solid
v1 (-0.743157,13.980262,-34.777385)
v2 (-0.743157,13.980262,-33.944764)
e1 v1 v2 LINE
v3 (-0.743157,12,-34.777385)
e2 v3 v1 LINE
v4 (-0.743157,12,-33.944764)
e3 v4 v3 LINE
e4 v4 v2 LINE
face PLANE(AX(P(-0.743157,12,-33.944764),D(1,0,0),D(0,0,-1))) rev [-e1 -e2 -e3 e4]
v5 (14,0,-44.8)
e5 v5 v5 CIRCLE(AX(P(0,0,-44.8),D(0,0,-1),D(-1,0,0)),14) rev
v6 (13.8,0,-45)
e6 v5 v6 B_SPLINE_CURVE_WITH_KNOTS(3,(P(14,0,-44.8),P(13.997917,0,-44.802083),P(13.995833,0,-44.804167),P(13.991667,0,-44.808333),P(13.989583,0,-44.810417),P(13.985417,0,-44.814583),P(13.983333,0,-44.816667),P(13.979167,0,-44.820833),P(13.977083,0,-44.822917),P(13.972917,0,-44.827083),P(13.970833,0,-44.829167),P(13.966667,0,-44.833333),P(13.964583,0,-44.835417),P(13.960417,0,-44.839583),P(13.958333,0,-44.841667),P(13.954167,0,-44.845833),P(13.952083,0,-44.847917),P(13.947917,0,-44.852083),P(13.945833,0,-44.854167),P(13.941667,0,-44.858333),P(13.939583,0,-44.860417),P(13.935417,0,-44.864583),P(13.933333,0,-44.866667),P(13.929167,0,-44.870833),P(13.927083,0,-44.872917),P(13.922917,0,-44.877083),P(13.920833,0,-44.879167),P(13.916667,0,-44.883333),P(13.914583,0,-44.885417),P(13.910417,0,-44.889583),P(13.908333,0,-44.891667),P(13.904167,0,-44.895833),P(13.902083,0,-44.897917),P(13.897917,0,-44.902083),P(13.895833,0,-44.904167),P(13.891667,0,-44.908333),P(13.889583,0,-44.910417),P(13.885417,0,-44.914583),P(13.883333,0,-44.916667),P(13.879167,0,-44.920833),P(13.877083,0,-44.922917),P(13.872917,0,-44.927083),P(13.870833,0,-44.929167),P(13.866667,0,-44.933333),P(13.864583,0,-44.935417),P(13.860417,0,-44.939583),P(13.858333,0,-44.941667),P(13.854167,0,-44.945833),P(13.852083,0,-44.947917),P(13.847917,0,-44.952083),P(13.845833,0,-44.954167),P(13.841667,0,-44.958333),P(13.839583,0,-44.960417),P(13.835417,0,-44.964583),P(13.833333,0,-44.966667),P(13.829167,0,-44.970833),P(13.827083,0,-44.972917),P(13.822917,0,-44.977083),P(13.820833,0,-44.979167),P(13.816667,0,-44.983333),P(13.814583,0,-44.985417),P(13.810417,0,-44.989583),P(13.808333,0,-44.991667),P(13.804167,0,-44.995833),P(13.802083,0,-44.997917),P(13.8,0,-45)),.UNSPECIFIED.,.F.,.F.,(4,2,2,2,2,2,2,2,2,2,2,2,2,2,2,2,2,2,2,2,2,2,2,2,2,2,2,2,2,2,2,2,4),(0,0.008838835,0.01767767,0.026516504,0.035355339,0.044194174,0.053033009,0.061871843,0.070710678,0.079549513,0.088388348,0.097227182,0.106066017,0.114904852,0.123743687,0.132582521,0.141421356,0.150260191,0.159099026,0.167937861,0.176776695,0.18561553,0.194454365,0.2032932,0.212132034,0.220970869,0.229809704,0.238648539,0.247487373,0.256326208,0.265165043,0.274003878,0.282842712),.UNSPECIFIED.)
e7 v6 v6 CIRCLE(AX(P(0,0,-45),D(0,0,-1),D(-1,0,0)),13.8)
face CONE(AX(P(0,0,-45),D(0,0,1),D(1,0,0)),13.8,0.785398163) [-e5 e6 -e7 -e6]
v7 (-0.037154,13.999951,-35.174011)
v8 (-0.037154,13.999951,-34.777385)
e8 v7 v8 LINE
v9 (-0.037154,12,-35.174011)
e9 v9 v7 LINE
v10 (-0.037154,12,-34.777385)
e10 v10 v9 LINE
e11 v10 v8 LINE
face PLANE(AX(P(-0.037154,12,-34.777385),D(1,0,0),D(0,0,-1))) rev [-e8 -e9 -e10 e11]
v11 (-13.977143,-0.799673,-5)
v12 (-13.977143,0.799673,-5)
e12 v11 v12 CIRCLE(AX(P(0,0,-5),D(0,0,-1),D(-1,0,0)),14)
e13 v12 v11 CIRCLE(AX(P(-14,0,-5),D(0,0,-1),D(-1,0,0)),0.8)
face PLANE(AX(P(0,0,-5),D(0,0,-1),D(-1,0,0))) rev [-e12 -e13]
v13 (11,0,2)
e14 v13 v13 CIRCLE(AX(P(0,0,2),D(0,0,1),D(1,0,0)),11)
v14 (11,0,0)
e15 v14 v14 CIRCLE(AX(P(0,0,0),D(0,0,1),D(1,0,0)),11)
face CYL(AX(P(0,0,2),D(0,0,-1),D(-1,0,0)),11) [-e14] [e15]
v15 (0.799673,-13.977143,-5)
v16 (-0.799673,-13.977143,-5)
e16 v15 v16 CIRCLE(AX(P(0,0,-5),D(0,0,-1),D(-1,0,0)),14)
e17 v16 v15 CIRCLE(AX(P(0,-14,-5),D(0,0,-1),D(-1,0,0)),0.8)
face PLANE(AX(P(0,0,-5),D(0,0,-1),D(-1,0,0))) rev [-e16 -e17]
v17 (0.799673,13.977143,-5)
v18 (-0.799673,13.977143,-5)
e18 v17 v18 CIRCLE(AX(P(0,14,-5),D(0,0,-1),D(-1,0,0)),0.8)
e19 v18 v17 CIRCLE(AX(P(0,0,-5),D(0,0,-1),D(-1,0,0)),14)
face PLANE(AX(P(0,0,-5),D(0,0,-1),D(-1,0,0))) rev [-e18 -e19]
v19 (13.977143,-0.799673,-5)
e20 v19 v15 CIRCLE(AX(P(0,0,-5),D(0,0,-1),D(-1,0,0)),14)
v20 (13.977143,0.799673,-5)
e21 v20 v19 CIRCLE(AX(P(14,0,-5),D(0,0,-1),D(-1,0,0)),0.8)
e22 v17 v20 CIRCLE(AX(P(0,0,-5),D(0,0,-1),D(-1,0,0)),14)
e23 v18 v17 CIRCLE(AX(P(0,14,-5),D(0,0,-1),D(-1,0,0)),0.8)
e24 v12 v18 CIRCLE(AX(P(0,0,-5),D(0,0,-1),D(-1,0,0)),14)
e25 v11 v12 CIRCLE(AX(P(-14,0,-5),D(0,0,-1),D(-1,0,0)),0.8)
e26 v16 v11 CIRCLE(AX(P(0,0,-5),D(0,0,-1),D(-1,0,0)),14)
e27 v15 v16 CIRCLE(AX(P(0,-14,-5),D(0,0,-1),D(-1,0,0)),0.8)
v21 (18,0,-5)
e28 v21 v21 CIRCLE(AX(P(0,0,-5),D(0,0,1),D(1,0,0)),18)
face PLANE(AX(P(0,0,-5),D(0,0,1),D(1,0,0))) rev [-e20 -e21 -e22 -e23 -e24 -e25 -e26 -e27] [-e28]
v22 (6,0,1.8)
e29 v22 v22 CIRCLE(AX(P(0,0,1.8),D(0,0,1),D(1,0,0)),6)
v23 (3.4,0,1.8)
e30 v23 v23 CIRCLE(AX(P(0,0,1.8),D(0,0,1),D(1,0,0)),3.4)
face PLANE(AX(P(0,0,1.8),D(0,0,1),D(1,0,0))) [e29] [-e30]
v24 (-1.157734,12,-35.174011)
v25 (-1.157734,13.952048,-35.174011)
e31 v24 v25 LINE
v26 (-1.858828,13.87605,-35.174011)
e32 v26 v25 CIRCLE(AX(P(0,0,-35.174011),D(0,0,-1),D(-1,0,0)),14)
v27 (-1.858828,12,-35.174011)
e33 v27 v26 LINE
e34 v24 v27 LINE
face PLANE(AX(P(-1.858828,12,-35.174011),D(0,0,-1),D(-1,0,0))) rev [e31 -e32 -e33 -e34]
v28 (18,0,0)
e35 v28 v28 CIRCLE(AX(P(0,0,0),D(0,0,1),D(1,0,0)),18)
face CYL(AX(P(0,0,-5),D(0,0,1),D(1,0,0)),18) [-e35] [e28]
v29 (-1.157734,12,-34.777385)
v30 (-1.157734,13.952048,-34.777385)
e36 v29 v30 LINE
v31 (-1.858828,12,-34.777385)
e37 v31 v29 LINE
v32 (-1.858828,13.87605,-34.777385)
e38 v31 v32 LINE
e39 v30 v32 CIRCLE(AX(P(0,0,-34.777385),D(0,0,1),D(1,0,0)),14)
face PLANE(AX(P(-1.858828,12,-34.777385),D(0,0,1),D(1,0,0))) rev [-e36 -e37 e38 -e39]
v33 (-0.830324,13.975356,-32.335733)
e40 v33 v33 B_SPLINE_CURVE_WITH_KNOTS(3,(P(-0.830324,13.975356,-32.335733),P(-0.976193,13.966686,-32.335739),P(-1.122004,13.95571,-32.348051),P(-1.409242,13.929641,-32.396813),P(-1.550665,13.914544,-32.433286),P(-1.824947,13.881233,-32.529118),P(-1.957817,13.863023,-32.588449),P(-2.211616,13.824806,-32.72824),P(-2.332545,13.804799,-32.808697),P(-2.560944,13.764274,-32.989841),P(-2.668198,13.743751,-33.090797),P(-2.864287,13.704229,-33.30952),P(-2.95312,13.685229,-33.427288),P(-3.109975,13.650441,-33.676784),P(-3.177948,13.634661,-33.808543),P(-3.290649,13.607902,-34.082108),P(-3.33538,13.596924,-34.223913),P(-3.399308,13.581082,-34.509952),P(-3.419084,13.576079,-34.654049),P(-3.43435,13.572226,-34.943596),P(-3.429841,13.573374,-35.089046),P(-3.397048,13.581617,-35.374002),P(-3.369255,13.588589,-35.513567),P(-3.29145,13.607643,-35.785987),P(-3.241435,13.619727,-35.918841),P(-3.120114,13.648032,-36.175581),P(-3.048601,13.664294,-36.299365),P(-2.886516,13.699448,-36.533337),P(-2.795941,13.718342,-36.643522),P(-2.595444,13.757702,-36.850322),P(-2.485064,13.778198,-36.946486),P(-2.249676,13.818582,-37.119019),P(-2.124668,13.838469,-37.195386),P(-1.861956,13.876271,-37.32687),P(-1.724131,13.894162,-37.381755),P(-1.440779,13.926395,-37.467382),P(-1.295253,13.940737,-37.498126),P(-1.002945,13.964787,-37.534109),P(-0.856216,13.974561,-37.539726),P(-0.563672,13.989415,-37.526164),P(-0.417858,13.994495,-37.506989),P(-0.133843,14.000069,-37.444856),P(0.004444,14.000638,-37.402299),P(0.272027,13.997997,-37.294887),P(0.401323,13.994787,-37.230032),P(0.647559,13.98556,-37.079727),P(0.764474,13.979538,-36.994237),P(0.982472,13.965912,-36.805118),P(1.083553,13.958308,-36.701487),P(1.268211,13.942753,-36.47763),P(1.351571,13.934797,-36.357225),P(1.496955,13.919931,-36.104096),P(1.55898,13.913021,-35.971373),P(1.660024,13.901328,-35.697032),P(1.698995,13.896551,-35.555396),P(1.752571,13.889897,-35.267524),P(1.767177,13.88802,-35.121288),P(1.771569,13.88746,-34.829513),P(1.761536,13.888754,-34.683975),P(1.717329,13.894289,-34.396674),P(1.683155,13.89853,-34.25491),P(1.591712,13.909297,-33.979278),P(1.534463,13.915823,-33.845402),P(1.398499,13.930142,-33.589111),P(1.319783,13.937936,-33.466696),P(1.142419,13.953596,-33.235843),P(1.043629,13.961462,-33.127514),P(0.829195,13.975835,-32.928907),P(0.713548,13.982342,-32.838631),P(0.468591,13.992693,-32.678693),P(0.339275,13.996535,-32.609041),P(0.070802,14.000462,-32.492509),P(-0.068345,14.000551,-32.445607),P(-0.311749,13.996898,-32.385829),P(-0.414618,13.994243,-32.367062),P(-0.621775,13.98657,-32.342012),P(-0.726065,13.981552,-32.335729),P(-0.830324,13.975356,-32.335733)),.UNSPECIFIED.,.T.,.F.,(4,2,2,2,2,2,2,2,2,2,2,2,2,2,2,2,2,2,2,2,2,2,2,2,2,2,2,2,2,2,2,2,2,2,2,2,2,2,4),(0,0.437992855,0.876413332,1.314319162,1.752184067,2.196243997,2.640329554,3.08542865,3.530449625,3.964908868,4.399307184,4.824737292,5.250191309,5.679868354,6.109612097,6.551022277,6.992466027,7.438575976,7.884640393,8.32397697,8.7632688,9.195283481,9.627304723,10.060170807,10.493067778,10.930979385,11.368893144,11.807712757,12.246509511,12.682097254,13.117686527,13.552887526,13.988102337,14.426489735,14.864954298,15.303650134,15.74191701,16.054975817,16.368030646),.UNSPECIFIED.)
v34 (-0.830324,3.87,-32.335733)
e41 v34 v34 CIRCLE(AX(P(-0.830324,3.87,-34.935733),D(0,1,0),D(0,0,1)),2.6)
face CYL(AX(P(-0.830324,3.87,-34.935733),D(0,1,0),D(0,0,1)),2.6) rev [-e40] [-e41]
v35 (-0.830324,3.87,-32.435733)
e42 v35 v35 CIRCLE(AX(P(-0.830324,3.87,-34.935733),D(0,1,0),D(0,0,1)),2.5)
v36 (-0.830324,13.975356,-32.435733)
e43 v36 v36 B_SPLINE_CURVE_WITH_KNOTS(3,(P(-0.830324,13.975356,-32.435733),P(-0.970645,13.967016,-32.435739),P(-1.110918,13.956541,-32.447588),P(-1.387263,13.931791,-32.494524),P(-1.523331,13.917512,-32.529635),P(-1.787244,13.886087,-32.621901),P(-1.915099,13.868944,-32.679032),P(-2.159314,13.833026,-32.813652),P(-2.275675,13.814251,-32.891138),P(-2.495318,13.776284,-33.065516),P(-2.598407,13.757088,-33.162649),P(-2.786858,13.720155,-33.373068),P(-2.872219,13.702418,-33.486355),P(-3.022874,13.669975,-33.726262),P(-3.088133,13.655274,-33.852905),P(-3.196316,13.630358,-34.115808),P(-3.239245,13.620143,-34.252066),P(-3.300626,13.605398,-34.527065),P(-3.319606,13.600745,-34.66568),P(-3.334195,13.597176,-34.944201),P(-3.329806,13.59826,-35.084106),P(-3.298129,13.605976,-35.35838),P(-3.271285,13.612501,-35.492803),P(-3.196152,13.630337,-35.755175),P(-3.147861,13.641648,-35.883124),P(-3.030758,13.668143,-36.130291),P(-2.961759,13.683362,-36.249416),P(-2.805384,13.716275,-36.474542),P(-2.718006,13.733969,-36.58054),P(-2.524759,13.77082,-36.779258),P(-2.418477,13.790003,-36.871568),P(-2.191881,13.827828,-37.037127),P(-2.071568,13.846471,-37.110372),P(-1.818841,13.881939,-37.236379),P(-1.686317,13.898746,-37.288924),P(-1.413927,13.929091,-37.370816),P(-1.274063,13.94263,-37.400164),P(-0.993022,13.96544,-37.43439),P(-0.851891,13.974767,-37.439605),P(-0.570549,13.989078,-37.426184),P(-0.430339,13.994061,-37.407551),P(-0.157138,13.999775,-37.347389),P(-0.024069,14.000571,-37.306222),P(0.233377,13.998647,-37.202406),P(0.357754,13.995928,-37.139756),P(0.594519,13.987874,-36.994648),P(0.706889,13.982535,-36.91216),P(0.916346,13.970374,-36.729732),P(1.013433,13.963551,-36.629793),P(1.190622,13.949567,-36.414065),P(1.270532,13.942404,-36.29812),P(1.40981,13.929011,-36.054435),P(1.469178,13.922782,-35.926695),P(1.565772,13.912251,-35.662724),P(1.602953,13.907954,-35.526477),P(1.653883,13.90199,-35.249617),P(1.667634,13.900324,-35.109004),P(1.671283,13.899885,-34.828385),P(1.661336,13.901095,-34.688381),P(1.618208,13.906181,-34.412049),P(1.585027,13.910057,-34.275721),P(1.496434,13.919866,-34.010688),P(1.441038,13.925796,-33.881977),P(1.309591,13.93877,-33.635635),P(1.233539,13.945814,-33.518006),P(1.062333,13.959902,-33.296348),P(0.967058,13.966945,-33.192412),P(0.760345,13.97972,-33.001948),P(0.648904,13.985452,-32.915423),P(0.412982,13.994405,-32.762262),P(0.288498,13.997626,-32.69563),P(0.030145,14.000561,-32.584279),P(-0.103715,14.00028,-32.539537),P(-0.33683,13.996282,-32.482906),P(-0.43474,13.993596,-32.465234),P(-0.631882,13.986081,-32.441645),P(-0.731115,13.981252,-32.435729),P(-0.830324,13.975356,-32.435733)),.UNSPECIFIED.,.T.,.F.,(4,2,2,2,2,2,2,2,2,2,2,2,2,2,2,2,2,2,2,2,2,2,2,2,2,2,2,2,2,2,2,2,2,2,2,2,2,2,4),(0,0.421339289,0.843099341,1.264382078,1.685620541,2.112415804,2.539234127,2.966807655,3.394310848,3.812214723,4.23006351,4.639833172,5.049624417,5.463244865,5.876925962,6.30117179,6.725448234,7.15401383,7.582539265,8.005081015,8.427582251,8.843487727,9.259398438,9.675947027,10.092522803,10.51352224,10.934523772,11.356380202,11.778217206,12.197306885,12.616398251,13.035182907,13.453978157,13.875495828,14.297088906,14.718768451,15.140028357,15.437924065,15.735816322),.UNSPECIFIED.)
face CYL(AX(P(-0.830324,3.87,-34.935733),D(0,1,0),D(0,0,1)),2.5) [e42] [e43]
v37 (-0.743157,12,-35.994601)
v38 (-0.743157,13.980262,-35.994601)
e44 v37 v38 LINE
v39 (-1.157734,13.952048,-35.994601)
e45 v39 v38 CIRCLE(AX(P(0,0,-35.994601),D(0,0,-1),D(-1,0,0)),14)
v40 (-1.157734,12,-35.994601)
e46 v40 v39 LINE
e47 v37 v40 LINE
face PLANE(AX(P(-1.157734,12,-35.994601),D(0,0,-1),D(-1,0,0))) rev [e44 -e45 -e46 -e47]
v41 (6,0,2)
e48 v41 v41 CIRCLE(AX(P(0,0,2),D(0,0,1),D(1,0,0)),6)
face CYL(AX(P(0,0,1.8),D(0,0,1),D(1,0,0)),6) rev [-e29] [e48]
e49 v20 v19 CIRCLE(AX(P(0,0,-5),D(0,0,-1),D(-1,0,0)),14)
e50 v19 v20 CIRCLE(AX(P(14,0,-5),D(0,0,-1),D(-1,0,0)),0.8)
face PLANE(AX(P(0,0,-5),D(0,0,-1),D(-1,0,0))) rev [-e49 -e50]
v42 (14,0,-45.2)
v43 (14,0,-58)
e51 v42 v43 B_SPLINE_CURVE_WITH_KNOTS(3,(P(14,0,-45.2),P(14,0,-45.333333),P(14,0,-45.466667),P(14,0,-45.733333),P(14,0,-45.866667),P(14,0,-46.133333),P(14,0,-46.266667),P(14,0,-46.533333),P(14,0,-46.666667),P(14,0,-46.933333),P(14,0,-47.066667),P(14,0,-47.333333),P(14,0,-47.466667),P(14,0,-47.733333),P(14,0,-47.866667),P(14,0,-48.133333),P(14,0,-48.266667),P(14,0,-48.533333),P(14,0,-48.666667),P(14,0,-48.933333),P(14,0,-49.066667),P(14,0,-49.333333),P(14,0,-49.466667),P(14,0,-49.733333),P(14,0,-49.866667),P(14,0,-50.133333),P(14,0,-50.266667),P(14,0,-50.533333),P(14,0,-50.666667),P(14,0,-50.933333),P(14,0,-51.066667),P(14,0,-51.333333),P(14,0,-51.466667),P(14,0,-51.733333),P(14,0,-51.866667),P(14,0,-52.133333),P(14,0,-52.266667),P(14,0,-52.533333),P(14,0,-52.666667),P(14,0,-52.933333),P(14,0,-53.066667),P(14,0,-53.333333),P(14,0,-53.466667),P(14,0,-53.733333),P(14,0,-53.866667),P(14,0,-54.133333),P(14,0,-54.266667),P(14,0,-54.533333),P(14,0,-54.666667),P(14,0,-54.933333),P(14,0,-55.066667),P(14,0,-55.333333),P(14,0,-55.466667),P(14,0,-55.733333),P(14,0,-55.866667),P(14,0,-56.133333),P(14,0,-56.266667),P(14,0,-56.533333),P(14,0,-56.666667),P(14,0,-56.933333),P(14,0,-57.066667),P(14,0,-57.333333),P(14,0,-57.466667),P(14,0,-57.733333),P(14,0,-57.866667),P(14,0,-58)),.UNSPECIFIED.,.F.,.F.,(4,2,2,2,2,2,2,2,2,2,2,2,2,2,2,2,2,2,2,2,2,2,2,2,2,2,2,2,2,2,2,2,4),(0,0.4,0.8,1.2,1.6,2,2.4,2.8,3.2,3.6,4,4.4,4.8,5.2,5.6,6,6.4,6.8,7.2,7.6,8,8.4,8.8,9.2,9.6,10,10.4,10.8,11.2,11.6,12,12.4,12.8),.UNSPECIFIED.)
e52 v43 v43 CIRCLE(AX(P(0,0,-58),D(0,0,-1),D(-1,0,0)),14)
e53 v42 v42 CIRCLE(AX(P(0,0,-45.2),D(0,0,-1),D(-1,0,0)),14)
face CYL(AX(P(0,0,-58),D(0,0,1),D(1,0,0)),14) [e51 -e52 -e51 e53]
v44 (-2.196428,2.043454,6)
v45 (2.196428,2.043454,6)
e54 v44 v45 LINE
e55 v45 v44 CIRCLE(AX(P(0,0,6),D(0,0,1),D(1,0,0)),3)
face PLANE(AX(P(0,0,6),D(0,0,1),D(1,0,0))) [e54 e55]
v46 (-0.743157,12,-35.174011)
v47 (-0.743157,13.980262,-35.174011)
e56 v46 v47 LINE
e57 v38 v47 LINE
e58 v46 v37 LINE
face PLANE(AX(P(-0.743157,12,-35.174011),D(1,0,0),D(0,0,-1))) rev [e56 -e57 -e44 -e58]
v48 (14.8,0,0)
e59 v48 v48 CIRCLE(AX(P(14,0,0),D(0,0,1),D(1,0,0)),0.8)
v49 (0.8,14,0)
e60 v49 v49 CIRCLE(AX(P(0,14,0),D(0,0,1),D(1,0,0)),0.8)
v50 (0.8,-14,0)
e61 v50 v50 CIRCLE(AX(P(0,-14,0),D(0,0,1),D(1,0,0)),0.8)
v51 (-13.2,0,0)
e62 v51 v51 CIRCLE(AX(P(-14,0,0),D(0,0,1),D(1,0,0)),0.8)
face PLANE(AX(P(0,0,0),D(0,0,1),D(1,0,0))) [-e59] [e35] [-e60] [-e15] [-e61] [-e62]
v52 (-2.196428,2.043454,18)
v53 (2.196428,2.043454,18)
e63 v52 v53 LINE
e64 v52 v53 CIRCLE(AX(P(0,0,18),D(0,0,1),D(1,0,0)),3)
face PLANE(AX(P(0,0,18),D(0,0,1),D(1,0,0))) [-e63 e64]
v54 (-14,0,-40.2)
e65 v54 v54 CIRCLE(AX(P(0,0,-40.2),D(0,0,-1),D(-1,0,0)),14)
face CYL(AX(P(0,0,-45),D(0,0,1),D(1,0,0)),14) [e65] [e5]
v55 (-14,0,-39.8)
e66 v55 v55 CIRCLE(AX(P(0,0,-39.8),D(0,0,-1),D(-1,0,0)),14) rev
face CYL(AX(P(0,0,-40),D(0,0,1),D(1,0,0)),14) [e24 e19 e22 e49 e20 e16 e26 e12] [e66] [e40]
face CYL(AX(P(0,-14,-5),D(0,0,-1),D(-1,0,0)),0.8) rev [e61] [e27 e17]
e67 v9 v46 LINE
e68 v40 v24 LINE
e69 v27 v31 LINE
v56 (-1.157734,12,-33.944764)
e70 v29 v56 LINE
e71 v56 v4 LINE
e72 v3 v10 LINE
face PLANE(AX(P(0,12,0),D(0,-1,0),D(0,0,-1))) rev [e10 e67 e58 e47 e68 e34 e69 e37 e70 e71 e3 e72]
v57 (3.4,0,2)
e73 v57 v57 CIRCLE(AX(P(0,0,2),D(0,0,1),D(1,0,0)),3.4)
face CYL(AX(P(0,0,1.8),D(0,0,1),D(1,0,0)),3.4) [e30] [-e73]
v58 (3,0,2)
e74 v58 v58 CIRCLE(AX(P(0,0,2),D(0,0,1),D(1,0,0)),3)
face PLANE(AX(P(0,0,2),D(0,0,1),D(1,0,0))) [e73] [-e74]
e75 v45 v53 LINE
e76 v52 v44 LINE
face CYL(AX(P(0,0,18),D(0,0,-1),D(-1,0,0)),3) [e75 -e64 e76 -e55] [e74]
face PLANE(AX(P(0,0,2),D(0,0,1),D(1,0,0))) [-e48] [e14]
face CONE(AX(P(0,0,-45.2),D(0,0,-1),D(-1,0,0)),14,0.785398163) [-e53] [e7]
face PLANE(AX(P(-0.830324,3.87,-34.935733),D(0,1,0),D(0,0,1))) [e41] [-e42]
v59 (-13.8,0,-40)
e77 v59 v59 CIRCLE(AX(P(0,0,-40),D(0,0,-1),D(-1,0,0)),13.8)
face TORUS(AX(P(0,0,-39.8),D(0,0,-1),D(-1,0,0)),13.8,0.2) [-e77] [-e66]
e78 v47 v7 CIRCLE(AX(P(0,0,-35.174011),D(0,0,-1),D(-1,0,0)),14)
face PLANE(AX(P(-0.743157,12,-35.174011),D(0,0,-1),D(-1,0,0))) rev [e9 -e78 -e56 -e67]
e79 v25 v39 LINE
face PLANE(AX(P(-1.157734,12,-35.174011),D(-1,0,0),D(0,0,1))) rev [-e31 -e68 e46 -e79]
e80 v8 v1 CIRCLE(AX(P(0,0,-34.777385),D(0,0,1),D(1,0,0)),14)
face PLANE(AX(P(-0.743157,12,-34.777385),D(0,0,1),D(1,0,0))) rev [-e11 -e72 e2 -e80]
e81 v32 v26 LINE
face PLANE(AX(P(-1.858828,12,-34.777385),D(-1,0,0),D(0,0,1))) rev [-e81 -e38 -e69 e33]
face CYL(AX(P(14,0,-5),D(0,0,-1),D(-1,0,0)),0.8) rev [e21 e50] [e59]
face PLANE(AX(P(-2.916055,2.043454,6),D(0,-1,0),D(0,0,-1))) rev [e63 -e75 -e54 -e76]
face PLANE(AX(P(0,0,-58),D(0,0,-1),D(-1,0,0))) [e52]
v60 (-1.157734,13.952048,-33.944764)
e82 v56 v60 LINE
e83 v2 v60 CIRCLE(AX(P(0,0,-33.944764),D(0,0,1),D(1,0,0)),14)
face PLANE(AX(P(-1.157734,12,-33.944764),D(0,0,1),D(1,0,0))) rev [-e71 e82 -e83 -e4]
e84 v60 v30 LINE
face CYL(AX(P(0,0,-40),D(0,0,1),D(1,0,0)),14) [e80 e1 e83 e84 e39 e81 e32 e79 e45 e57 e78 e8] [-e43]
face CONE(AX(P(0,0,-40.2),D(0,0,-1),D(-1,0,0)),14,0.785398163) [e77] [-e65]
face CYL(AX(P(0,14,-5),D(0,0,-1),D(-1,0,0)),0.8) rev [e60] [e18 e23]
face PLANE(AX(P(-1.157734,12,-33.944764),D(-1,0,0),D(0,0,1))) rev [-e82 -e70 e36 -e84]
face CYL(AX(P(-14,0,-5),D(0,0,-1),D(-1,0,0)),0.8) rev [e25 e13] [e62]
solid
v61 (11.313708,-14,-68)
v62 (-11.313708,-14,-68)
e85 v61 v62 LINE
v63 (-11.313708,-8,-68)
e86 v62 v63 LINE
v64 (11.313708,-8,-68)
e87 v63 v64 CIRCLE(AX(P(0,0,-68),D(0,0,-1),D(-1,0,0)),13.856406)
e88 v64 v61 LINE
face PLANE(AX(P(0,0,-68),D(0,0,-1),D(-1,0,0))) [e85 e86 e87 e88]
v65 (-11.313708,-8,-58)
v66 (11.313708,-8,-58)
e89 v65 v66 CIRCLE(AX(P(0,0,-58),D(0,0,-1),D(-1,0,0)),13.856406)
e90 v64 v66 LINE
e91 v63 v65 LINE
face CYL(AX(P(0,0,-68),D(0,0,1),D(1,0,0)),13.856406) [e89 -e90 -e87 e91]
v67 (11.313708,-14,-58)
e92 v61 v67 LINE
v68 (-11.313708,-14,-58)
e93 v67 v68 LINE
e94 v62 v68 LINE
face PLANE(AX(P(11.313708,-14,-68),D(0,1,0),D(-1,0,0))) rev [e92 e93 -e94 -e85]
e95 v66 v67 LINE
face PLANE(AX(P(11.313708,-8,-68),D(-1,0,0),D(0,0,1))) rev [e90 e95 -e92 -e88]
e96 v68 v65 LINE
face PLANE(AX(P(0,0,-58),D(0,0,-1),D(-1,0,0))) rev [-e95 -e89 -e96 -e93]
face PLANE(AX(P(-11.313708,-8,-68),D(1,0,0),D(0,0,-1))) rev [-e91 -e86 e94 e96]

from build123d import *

# Parameters (mm, degrees)
SKETCH1_R                   = 18
BOSS_EXTRUDE2_DEPTH         = 5
SKETCH1_4_R                 = 11
BOSS_EXTRUDE3_DEPTH         = 2
SKETCH2_R                   = 3
BOSS_EXTRUDE4_DEPTH         = 16
SKETCH3_W                   = 6.362998302
SKETCH3_H                   = 1.749824533
CUT_EXTRUDE1_DEPTH          = 12
SKETCH4_R                   = 6
SKETCH4_R_2                 = 3.4
CUT_EXTRUDE2_DEPTH          = 0.2
TAP_DRILL_FOR_M2X0_4_TAP1_D = 1.6
SKETCH5_R                   = 14
BOSS_EXTRUDE5_DEPTH         = 35
FILLET2_R                   = 0.2
SKETCH7_R                   = 14
BOSS_EXTRUDE6_DEPTH         = 5
CHAMFER1_SIZE               = 0.2
SKETCH10_R                  = 14
BOSS_EXTRUDE7_DEPTH         = 13
CHAMFER2_SIZE               = 0.2
BOSS_EXTRUDE8_DEPTH         = 10
SKETCH12_R                  = 2.6
SKETCH12_R_2                = 2.5
CUT_EXTRUDE3_DEPTH          = 10.13
CUT_EXTRUDE4_DEPTH          = 2


# Some blends are built 0.0001 mm under size
with BuildPart() as part:
    # Sketch1 → Boss-Extrude2 (new body)
    with BuildSketch(Plane.XY):
        Circle(SKETCH1_R)
    extrude(amount=-BOSS_EXTRUDE2_DEPTH)

    # Sketch1<4> → Boss-Extrude3 (add)
    with BuildSketch(Plane.XY):
        Circle(SKETCH1_4_R)
    extrude(amount=BOSS_EXTRUDE3_DEPTH)

    # Sketch2 → Boss-Extrude4 (add)
    with BuildSketch(Plane.XY.offset(2)):
        Circle(SKETCH2_R)
    extrude(amount=BOSS_EXTRUDE4_DEPTH)

    # Sketch3 → Cut-Extrude1 (cut)
    with BuildSketch(Plane.XY.offset(18)):
        with Locations((0.265444357, 2.918366652)):
            Rectangle(SKETCH3_W, SKETCH3_H)
    extrude(amount=-CUT_EXTRUDE1_DEPTH, mode=Mode.SUBTRACT)

    # Sketch4 → Cut-Extrude2 (cut)
    with BuildSketch(Plane.XY.offset(2)):
        Circle(SKETCH4_R)
        Circle(SKETCH4_R_2, mode=Mode.SUBTRACT)
    extrude(amount=-CUT_EXTRUDE2_DEPTH, mode=Mode.SUBTRACT)

    # Tap Drill for M2x0.4 Tap1 (through all)
    with Locations(Plane(origin=(0, 14, -5), x_dir=(-1, 0, 0), z_dir=(0, 0, -1))):
        with Locations((0, 0), (-14, -14), (0, -28), (14, -14)):
            Hole(TAP_DRILL_FOR_M2X0_4_TAP1_D / 2)

    # Sketch5 → Boss-Extrude5 (add)
    with BuildSketch(Plane(origin=(0, 0, -5), x_dir=(-1, 0, 0), z_dir=(0, 0, -1))):
        with Locations(Location((0, 0, 0), (0, 0, 176.725509844))):
            Circle(SKETCH5_R)
    extrude(amount=BOSS_EXTRUDE5_DEPTH)

    # Fillet2
    fillet2_edges = [part.edges().sort_by_distance(p)[0] for p in [
        (-13.977142857, -0.799673403, -40),
    ]]
    fillet(fillet2_edges, radius=FILLET2_R)

    # Sketch7 → Boss-Extrude6 (add)
    with BuildSketch(Plane(origin=(0, 0, -40), x_dir=(-1, 0, 0), z_dir=(0, 0, -1))):
        with Locations(Location((0, 0, 0), (0, 0, 176.725509844))):
            Circle(SKETCH7_R)
    extrude(amount=BOSS_EXTRUDE6_DEPTH)

    # Chamfer1
    chamfer1_edges = [part.edges().sort_by_distance(p)[0] for p in [
        (-13.977142857, -0.799673403, -40),
        (-13.977142857, -0.799673403, -45),
    ]]
    chamfer(chamfer1_edges, length=CHAMFER1_SIZE - 0.0001)  # a hair under: the kernel refuses the full size

    # Sketch10 → Boss-Extrude7 (add)
    with BuildSketch(Plane(origin=(0, 0, -45), x_dir=(-1, 0, 0), z_dir=(0, 0, -1))):
        with Locations(Location((0, 0, 0), (0, 0, 176.725509844))):
            Circle(SKETCH10_R)
    extrude(amount=BOSS_EXTRUDE7_DEPTH)

    # Chamfer2
    # the kernel refuses this chamfer: 0.2 mm, written as the material it takes off along each edge
    with BuildSketch(Plane(origin=(0, 0, -45), x_dir=(0.9983673469383324, 0.057119528773576726, 0), z_dir=(-0.057119528773576726, 0.9983673469383324, 0))) as chamfer2_piece_1:
        Polygon((14, CHAMFER2_SIZE), (14 - CHAMFER2_SIZE, 0), (14, 0), align=None)
    revolve(axis=Axis((0, 0, -45), (0, 0, -1)), mode=Mode.SUBTRACT)

    # Sketch12 → Cut-Extrude3 (cut)
    with BuildSketch(Plane(origin=(0, 14, 0), x_dir=(1, 0, 0), z_dir=(0, 1, 0))):
        with Locations(Location((-0.830324238, 34.935733276, 0), (0, 0, 270))):
            Circle(SKETCH12_R)
        with Locations(Location((-0.830324238, 34.935733276, 0), (0, 0, 270))):
            Circle(SKETCH12_R_2, mode=Mode.SUBTRACT)
    extrude(amount=-CUT_EXTRUDE3_DEPTH, mode=Mode.SUBTRACT)

    # Sketch13 → Cut-Extrude4 (cut)
    with BuildSketch(Plane(origin=(0, 14, 0), x_dir=(1, 0, 0), z_dir=(0, 1, 0))):
        Polygon((-0.743156629, 35.174011268), (-0.037154138, 35.174011268), (-0.037154138, 34.777385043), (-0.743156629, 34.777385043), (-0.743156629, 33.944764058), (-1.157734464, 33.944764058), (-1.157734464, 34.777385043), (-1.858828415, 34.777385043), (-1.858828415, 35.174011268), (-1.157734464, 35.174011268), (-1.157734464, 35.994600549), (-0.743156629, 35.994600549), align=None)
    extrude(amount=-CUT_EXTRUDE4_DEPTH, mode=Mode.SUBTRACT)


with BuildPart() as body_2:
    # Sketch11 → Boss-Extrude8 (new body)
    with BuildSketch(Plane(origin=(0, 0, -58), x_dir=(-1, 0, 0), z_dir=(0, 0, -1))):
        with BuildLine():
            Line((-11.313708499, -8), (-11.313708499, -14))
            Line((-11.313708499, -14), (11.313708499, -14))
            Line((11.313708499, -14), (11.313708499, -8))
            ThreePointArc((11.313708499, -8), (0, 13.856406461), (-11.313708499, -8))
        make_face()
    extrude(amount=BOSS_EXTRUDE8_DEPTH)


solid = Compound([part.part, body_2.part])
